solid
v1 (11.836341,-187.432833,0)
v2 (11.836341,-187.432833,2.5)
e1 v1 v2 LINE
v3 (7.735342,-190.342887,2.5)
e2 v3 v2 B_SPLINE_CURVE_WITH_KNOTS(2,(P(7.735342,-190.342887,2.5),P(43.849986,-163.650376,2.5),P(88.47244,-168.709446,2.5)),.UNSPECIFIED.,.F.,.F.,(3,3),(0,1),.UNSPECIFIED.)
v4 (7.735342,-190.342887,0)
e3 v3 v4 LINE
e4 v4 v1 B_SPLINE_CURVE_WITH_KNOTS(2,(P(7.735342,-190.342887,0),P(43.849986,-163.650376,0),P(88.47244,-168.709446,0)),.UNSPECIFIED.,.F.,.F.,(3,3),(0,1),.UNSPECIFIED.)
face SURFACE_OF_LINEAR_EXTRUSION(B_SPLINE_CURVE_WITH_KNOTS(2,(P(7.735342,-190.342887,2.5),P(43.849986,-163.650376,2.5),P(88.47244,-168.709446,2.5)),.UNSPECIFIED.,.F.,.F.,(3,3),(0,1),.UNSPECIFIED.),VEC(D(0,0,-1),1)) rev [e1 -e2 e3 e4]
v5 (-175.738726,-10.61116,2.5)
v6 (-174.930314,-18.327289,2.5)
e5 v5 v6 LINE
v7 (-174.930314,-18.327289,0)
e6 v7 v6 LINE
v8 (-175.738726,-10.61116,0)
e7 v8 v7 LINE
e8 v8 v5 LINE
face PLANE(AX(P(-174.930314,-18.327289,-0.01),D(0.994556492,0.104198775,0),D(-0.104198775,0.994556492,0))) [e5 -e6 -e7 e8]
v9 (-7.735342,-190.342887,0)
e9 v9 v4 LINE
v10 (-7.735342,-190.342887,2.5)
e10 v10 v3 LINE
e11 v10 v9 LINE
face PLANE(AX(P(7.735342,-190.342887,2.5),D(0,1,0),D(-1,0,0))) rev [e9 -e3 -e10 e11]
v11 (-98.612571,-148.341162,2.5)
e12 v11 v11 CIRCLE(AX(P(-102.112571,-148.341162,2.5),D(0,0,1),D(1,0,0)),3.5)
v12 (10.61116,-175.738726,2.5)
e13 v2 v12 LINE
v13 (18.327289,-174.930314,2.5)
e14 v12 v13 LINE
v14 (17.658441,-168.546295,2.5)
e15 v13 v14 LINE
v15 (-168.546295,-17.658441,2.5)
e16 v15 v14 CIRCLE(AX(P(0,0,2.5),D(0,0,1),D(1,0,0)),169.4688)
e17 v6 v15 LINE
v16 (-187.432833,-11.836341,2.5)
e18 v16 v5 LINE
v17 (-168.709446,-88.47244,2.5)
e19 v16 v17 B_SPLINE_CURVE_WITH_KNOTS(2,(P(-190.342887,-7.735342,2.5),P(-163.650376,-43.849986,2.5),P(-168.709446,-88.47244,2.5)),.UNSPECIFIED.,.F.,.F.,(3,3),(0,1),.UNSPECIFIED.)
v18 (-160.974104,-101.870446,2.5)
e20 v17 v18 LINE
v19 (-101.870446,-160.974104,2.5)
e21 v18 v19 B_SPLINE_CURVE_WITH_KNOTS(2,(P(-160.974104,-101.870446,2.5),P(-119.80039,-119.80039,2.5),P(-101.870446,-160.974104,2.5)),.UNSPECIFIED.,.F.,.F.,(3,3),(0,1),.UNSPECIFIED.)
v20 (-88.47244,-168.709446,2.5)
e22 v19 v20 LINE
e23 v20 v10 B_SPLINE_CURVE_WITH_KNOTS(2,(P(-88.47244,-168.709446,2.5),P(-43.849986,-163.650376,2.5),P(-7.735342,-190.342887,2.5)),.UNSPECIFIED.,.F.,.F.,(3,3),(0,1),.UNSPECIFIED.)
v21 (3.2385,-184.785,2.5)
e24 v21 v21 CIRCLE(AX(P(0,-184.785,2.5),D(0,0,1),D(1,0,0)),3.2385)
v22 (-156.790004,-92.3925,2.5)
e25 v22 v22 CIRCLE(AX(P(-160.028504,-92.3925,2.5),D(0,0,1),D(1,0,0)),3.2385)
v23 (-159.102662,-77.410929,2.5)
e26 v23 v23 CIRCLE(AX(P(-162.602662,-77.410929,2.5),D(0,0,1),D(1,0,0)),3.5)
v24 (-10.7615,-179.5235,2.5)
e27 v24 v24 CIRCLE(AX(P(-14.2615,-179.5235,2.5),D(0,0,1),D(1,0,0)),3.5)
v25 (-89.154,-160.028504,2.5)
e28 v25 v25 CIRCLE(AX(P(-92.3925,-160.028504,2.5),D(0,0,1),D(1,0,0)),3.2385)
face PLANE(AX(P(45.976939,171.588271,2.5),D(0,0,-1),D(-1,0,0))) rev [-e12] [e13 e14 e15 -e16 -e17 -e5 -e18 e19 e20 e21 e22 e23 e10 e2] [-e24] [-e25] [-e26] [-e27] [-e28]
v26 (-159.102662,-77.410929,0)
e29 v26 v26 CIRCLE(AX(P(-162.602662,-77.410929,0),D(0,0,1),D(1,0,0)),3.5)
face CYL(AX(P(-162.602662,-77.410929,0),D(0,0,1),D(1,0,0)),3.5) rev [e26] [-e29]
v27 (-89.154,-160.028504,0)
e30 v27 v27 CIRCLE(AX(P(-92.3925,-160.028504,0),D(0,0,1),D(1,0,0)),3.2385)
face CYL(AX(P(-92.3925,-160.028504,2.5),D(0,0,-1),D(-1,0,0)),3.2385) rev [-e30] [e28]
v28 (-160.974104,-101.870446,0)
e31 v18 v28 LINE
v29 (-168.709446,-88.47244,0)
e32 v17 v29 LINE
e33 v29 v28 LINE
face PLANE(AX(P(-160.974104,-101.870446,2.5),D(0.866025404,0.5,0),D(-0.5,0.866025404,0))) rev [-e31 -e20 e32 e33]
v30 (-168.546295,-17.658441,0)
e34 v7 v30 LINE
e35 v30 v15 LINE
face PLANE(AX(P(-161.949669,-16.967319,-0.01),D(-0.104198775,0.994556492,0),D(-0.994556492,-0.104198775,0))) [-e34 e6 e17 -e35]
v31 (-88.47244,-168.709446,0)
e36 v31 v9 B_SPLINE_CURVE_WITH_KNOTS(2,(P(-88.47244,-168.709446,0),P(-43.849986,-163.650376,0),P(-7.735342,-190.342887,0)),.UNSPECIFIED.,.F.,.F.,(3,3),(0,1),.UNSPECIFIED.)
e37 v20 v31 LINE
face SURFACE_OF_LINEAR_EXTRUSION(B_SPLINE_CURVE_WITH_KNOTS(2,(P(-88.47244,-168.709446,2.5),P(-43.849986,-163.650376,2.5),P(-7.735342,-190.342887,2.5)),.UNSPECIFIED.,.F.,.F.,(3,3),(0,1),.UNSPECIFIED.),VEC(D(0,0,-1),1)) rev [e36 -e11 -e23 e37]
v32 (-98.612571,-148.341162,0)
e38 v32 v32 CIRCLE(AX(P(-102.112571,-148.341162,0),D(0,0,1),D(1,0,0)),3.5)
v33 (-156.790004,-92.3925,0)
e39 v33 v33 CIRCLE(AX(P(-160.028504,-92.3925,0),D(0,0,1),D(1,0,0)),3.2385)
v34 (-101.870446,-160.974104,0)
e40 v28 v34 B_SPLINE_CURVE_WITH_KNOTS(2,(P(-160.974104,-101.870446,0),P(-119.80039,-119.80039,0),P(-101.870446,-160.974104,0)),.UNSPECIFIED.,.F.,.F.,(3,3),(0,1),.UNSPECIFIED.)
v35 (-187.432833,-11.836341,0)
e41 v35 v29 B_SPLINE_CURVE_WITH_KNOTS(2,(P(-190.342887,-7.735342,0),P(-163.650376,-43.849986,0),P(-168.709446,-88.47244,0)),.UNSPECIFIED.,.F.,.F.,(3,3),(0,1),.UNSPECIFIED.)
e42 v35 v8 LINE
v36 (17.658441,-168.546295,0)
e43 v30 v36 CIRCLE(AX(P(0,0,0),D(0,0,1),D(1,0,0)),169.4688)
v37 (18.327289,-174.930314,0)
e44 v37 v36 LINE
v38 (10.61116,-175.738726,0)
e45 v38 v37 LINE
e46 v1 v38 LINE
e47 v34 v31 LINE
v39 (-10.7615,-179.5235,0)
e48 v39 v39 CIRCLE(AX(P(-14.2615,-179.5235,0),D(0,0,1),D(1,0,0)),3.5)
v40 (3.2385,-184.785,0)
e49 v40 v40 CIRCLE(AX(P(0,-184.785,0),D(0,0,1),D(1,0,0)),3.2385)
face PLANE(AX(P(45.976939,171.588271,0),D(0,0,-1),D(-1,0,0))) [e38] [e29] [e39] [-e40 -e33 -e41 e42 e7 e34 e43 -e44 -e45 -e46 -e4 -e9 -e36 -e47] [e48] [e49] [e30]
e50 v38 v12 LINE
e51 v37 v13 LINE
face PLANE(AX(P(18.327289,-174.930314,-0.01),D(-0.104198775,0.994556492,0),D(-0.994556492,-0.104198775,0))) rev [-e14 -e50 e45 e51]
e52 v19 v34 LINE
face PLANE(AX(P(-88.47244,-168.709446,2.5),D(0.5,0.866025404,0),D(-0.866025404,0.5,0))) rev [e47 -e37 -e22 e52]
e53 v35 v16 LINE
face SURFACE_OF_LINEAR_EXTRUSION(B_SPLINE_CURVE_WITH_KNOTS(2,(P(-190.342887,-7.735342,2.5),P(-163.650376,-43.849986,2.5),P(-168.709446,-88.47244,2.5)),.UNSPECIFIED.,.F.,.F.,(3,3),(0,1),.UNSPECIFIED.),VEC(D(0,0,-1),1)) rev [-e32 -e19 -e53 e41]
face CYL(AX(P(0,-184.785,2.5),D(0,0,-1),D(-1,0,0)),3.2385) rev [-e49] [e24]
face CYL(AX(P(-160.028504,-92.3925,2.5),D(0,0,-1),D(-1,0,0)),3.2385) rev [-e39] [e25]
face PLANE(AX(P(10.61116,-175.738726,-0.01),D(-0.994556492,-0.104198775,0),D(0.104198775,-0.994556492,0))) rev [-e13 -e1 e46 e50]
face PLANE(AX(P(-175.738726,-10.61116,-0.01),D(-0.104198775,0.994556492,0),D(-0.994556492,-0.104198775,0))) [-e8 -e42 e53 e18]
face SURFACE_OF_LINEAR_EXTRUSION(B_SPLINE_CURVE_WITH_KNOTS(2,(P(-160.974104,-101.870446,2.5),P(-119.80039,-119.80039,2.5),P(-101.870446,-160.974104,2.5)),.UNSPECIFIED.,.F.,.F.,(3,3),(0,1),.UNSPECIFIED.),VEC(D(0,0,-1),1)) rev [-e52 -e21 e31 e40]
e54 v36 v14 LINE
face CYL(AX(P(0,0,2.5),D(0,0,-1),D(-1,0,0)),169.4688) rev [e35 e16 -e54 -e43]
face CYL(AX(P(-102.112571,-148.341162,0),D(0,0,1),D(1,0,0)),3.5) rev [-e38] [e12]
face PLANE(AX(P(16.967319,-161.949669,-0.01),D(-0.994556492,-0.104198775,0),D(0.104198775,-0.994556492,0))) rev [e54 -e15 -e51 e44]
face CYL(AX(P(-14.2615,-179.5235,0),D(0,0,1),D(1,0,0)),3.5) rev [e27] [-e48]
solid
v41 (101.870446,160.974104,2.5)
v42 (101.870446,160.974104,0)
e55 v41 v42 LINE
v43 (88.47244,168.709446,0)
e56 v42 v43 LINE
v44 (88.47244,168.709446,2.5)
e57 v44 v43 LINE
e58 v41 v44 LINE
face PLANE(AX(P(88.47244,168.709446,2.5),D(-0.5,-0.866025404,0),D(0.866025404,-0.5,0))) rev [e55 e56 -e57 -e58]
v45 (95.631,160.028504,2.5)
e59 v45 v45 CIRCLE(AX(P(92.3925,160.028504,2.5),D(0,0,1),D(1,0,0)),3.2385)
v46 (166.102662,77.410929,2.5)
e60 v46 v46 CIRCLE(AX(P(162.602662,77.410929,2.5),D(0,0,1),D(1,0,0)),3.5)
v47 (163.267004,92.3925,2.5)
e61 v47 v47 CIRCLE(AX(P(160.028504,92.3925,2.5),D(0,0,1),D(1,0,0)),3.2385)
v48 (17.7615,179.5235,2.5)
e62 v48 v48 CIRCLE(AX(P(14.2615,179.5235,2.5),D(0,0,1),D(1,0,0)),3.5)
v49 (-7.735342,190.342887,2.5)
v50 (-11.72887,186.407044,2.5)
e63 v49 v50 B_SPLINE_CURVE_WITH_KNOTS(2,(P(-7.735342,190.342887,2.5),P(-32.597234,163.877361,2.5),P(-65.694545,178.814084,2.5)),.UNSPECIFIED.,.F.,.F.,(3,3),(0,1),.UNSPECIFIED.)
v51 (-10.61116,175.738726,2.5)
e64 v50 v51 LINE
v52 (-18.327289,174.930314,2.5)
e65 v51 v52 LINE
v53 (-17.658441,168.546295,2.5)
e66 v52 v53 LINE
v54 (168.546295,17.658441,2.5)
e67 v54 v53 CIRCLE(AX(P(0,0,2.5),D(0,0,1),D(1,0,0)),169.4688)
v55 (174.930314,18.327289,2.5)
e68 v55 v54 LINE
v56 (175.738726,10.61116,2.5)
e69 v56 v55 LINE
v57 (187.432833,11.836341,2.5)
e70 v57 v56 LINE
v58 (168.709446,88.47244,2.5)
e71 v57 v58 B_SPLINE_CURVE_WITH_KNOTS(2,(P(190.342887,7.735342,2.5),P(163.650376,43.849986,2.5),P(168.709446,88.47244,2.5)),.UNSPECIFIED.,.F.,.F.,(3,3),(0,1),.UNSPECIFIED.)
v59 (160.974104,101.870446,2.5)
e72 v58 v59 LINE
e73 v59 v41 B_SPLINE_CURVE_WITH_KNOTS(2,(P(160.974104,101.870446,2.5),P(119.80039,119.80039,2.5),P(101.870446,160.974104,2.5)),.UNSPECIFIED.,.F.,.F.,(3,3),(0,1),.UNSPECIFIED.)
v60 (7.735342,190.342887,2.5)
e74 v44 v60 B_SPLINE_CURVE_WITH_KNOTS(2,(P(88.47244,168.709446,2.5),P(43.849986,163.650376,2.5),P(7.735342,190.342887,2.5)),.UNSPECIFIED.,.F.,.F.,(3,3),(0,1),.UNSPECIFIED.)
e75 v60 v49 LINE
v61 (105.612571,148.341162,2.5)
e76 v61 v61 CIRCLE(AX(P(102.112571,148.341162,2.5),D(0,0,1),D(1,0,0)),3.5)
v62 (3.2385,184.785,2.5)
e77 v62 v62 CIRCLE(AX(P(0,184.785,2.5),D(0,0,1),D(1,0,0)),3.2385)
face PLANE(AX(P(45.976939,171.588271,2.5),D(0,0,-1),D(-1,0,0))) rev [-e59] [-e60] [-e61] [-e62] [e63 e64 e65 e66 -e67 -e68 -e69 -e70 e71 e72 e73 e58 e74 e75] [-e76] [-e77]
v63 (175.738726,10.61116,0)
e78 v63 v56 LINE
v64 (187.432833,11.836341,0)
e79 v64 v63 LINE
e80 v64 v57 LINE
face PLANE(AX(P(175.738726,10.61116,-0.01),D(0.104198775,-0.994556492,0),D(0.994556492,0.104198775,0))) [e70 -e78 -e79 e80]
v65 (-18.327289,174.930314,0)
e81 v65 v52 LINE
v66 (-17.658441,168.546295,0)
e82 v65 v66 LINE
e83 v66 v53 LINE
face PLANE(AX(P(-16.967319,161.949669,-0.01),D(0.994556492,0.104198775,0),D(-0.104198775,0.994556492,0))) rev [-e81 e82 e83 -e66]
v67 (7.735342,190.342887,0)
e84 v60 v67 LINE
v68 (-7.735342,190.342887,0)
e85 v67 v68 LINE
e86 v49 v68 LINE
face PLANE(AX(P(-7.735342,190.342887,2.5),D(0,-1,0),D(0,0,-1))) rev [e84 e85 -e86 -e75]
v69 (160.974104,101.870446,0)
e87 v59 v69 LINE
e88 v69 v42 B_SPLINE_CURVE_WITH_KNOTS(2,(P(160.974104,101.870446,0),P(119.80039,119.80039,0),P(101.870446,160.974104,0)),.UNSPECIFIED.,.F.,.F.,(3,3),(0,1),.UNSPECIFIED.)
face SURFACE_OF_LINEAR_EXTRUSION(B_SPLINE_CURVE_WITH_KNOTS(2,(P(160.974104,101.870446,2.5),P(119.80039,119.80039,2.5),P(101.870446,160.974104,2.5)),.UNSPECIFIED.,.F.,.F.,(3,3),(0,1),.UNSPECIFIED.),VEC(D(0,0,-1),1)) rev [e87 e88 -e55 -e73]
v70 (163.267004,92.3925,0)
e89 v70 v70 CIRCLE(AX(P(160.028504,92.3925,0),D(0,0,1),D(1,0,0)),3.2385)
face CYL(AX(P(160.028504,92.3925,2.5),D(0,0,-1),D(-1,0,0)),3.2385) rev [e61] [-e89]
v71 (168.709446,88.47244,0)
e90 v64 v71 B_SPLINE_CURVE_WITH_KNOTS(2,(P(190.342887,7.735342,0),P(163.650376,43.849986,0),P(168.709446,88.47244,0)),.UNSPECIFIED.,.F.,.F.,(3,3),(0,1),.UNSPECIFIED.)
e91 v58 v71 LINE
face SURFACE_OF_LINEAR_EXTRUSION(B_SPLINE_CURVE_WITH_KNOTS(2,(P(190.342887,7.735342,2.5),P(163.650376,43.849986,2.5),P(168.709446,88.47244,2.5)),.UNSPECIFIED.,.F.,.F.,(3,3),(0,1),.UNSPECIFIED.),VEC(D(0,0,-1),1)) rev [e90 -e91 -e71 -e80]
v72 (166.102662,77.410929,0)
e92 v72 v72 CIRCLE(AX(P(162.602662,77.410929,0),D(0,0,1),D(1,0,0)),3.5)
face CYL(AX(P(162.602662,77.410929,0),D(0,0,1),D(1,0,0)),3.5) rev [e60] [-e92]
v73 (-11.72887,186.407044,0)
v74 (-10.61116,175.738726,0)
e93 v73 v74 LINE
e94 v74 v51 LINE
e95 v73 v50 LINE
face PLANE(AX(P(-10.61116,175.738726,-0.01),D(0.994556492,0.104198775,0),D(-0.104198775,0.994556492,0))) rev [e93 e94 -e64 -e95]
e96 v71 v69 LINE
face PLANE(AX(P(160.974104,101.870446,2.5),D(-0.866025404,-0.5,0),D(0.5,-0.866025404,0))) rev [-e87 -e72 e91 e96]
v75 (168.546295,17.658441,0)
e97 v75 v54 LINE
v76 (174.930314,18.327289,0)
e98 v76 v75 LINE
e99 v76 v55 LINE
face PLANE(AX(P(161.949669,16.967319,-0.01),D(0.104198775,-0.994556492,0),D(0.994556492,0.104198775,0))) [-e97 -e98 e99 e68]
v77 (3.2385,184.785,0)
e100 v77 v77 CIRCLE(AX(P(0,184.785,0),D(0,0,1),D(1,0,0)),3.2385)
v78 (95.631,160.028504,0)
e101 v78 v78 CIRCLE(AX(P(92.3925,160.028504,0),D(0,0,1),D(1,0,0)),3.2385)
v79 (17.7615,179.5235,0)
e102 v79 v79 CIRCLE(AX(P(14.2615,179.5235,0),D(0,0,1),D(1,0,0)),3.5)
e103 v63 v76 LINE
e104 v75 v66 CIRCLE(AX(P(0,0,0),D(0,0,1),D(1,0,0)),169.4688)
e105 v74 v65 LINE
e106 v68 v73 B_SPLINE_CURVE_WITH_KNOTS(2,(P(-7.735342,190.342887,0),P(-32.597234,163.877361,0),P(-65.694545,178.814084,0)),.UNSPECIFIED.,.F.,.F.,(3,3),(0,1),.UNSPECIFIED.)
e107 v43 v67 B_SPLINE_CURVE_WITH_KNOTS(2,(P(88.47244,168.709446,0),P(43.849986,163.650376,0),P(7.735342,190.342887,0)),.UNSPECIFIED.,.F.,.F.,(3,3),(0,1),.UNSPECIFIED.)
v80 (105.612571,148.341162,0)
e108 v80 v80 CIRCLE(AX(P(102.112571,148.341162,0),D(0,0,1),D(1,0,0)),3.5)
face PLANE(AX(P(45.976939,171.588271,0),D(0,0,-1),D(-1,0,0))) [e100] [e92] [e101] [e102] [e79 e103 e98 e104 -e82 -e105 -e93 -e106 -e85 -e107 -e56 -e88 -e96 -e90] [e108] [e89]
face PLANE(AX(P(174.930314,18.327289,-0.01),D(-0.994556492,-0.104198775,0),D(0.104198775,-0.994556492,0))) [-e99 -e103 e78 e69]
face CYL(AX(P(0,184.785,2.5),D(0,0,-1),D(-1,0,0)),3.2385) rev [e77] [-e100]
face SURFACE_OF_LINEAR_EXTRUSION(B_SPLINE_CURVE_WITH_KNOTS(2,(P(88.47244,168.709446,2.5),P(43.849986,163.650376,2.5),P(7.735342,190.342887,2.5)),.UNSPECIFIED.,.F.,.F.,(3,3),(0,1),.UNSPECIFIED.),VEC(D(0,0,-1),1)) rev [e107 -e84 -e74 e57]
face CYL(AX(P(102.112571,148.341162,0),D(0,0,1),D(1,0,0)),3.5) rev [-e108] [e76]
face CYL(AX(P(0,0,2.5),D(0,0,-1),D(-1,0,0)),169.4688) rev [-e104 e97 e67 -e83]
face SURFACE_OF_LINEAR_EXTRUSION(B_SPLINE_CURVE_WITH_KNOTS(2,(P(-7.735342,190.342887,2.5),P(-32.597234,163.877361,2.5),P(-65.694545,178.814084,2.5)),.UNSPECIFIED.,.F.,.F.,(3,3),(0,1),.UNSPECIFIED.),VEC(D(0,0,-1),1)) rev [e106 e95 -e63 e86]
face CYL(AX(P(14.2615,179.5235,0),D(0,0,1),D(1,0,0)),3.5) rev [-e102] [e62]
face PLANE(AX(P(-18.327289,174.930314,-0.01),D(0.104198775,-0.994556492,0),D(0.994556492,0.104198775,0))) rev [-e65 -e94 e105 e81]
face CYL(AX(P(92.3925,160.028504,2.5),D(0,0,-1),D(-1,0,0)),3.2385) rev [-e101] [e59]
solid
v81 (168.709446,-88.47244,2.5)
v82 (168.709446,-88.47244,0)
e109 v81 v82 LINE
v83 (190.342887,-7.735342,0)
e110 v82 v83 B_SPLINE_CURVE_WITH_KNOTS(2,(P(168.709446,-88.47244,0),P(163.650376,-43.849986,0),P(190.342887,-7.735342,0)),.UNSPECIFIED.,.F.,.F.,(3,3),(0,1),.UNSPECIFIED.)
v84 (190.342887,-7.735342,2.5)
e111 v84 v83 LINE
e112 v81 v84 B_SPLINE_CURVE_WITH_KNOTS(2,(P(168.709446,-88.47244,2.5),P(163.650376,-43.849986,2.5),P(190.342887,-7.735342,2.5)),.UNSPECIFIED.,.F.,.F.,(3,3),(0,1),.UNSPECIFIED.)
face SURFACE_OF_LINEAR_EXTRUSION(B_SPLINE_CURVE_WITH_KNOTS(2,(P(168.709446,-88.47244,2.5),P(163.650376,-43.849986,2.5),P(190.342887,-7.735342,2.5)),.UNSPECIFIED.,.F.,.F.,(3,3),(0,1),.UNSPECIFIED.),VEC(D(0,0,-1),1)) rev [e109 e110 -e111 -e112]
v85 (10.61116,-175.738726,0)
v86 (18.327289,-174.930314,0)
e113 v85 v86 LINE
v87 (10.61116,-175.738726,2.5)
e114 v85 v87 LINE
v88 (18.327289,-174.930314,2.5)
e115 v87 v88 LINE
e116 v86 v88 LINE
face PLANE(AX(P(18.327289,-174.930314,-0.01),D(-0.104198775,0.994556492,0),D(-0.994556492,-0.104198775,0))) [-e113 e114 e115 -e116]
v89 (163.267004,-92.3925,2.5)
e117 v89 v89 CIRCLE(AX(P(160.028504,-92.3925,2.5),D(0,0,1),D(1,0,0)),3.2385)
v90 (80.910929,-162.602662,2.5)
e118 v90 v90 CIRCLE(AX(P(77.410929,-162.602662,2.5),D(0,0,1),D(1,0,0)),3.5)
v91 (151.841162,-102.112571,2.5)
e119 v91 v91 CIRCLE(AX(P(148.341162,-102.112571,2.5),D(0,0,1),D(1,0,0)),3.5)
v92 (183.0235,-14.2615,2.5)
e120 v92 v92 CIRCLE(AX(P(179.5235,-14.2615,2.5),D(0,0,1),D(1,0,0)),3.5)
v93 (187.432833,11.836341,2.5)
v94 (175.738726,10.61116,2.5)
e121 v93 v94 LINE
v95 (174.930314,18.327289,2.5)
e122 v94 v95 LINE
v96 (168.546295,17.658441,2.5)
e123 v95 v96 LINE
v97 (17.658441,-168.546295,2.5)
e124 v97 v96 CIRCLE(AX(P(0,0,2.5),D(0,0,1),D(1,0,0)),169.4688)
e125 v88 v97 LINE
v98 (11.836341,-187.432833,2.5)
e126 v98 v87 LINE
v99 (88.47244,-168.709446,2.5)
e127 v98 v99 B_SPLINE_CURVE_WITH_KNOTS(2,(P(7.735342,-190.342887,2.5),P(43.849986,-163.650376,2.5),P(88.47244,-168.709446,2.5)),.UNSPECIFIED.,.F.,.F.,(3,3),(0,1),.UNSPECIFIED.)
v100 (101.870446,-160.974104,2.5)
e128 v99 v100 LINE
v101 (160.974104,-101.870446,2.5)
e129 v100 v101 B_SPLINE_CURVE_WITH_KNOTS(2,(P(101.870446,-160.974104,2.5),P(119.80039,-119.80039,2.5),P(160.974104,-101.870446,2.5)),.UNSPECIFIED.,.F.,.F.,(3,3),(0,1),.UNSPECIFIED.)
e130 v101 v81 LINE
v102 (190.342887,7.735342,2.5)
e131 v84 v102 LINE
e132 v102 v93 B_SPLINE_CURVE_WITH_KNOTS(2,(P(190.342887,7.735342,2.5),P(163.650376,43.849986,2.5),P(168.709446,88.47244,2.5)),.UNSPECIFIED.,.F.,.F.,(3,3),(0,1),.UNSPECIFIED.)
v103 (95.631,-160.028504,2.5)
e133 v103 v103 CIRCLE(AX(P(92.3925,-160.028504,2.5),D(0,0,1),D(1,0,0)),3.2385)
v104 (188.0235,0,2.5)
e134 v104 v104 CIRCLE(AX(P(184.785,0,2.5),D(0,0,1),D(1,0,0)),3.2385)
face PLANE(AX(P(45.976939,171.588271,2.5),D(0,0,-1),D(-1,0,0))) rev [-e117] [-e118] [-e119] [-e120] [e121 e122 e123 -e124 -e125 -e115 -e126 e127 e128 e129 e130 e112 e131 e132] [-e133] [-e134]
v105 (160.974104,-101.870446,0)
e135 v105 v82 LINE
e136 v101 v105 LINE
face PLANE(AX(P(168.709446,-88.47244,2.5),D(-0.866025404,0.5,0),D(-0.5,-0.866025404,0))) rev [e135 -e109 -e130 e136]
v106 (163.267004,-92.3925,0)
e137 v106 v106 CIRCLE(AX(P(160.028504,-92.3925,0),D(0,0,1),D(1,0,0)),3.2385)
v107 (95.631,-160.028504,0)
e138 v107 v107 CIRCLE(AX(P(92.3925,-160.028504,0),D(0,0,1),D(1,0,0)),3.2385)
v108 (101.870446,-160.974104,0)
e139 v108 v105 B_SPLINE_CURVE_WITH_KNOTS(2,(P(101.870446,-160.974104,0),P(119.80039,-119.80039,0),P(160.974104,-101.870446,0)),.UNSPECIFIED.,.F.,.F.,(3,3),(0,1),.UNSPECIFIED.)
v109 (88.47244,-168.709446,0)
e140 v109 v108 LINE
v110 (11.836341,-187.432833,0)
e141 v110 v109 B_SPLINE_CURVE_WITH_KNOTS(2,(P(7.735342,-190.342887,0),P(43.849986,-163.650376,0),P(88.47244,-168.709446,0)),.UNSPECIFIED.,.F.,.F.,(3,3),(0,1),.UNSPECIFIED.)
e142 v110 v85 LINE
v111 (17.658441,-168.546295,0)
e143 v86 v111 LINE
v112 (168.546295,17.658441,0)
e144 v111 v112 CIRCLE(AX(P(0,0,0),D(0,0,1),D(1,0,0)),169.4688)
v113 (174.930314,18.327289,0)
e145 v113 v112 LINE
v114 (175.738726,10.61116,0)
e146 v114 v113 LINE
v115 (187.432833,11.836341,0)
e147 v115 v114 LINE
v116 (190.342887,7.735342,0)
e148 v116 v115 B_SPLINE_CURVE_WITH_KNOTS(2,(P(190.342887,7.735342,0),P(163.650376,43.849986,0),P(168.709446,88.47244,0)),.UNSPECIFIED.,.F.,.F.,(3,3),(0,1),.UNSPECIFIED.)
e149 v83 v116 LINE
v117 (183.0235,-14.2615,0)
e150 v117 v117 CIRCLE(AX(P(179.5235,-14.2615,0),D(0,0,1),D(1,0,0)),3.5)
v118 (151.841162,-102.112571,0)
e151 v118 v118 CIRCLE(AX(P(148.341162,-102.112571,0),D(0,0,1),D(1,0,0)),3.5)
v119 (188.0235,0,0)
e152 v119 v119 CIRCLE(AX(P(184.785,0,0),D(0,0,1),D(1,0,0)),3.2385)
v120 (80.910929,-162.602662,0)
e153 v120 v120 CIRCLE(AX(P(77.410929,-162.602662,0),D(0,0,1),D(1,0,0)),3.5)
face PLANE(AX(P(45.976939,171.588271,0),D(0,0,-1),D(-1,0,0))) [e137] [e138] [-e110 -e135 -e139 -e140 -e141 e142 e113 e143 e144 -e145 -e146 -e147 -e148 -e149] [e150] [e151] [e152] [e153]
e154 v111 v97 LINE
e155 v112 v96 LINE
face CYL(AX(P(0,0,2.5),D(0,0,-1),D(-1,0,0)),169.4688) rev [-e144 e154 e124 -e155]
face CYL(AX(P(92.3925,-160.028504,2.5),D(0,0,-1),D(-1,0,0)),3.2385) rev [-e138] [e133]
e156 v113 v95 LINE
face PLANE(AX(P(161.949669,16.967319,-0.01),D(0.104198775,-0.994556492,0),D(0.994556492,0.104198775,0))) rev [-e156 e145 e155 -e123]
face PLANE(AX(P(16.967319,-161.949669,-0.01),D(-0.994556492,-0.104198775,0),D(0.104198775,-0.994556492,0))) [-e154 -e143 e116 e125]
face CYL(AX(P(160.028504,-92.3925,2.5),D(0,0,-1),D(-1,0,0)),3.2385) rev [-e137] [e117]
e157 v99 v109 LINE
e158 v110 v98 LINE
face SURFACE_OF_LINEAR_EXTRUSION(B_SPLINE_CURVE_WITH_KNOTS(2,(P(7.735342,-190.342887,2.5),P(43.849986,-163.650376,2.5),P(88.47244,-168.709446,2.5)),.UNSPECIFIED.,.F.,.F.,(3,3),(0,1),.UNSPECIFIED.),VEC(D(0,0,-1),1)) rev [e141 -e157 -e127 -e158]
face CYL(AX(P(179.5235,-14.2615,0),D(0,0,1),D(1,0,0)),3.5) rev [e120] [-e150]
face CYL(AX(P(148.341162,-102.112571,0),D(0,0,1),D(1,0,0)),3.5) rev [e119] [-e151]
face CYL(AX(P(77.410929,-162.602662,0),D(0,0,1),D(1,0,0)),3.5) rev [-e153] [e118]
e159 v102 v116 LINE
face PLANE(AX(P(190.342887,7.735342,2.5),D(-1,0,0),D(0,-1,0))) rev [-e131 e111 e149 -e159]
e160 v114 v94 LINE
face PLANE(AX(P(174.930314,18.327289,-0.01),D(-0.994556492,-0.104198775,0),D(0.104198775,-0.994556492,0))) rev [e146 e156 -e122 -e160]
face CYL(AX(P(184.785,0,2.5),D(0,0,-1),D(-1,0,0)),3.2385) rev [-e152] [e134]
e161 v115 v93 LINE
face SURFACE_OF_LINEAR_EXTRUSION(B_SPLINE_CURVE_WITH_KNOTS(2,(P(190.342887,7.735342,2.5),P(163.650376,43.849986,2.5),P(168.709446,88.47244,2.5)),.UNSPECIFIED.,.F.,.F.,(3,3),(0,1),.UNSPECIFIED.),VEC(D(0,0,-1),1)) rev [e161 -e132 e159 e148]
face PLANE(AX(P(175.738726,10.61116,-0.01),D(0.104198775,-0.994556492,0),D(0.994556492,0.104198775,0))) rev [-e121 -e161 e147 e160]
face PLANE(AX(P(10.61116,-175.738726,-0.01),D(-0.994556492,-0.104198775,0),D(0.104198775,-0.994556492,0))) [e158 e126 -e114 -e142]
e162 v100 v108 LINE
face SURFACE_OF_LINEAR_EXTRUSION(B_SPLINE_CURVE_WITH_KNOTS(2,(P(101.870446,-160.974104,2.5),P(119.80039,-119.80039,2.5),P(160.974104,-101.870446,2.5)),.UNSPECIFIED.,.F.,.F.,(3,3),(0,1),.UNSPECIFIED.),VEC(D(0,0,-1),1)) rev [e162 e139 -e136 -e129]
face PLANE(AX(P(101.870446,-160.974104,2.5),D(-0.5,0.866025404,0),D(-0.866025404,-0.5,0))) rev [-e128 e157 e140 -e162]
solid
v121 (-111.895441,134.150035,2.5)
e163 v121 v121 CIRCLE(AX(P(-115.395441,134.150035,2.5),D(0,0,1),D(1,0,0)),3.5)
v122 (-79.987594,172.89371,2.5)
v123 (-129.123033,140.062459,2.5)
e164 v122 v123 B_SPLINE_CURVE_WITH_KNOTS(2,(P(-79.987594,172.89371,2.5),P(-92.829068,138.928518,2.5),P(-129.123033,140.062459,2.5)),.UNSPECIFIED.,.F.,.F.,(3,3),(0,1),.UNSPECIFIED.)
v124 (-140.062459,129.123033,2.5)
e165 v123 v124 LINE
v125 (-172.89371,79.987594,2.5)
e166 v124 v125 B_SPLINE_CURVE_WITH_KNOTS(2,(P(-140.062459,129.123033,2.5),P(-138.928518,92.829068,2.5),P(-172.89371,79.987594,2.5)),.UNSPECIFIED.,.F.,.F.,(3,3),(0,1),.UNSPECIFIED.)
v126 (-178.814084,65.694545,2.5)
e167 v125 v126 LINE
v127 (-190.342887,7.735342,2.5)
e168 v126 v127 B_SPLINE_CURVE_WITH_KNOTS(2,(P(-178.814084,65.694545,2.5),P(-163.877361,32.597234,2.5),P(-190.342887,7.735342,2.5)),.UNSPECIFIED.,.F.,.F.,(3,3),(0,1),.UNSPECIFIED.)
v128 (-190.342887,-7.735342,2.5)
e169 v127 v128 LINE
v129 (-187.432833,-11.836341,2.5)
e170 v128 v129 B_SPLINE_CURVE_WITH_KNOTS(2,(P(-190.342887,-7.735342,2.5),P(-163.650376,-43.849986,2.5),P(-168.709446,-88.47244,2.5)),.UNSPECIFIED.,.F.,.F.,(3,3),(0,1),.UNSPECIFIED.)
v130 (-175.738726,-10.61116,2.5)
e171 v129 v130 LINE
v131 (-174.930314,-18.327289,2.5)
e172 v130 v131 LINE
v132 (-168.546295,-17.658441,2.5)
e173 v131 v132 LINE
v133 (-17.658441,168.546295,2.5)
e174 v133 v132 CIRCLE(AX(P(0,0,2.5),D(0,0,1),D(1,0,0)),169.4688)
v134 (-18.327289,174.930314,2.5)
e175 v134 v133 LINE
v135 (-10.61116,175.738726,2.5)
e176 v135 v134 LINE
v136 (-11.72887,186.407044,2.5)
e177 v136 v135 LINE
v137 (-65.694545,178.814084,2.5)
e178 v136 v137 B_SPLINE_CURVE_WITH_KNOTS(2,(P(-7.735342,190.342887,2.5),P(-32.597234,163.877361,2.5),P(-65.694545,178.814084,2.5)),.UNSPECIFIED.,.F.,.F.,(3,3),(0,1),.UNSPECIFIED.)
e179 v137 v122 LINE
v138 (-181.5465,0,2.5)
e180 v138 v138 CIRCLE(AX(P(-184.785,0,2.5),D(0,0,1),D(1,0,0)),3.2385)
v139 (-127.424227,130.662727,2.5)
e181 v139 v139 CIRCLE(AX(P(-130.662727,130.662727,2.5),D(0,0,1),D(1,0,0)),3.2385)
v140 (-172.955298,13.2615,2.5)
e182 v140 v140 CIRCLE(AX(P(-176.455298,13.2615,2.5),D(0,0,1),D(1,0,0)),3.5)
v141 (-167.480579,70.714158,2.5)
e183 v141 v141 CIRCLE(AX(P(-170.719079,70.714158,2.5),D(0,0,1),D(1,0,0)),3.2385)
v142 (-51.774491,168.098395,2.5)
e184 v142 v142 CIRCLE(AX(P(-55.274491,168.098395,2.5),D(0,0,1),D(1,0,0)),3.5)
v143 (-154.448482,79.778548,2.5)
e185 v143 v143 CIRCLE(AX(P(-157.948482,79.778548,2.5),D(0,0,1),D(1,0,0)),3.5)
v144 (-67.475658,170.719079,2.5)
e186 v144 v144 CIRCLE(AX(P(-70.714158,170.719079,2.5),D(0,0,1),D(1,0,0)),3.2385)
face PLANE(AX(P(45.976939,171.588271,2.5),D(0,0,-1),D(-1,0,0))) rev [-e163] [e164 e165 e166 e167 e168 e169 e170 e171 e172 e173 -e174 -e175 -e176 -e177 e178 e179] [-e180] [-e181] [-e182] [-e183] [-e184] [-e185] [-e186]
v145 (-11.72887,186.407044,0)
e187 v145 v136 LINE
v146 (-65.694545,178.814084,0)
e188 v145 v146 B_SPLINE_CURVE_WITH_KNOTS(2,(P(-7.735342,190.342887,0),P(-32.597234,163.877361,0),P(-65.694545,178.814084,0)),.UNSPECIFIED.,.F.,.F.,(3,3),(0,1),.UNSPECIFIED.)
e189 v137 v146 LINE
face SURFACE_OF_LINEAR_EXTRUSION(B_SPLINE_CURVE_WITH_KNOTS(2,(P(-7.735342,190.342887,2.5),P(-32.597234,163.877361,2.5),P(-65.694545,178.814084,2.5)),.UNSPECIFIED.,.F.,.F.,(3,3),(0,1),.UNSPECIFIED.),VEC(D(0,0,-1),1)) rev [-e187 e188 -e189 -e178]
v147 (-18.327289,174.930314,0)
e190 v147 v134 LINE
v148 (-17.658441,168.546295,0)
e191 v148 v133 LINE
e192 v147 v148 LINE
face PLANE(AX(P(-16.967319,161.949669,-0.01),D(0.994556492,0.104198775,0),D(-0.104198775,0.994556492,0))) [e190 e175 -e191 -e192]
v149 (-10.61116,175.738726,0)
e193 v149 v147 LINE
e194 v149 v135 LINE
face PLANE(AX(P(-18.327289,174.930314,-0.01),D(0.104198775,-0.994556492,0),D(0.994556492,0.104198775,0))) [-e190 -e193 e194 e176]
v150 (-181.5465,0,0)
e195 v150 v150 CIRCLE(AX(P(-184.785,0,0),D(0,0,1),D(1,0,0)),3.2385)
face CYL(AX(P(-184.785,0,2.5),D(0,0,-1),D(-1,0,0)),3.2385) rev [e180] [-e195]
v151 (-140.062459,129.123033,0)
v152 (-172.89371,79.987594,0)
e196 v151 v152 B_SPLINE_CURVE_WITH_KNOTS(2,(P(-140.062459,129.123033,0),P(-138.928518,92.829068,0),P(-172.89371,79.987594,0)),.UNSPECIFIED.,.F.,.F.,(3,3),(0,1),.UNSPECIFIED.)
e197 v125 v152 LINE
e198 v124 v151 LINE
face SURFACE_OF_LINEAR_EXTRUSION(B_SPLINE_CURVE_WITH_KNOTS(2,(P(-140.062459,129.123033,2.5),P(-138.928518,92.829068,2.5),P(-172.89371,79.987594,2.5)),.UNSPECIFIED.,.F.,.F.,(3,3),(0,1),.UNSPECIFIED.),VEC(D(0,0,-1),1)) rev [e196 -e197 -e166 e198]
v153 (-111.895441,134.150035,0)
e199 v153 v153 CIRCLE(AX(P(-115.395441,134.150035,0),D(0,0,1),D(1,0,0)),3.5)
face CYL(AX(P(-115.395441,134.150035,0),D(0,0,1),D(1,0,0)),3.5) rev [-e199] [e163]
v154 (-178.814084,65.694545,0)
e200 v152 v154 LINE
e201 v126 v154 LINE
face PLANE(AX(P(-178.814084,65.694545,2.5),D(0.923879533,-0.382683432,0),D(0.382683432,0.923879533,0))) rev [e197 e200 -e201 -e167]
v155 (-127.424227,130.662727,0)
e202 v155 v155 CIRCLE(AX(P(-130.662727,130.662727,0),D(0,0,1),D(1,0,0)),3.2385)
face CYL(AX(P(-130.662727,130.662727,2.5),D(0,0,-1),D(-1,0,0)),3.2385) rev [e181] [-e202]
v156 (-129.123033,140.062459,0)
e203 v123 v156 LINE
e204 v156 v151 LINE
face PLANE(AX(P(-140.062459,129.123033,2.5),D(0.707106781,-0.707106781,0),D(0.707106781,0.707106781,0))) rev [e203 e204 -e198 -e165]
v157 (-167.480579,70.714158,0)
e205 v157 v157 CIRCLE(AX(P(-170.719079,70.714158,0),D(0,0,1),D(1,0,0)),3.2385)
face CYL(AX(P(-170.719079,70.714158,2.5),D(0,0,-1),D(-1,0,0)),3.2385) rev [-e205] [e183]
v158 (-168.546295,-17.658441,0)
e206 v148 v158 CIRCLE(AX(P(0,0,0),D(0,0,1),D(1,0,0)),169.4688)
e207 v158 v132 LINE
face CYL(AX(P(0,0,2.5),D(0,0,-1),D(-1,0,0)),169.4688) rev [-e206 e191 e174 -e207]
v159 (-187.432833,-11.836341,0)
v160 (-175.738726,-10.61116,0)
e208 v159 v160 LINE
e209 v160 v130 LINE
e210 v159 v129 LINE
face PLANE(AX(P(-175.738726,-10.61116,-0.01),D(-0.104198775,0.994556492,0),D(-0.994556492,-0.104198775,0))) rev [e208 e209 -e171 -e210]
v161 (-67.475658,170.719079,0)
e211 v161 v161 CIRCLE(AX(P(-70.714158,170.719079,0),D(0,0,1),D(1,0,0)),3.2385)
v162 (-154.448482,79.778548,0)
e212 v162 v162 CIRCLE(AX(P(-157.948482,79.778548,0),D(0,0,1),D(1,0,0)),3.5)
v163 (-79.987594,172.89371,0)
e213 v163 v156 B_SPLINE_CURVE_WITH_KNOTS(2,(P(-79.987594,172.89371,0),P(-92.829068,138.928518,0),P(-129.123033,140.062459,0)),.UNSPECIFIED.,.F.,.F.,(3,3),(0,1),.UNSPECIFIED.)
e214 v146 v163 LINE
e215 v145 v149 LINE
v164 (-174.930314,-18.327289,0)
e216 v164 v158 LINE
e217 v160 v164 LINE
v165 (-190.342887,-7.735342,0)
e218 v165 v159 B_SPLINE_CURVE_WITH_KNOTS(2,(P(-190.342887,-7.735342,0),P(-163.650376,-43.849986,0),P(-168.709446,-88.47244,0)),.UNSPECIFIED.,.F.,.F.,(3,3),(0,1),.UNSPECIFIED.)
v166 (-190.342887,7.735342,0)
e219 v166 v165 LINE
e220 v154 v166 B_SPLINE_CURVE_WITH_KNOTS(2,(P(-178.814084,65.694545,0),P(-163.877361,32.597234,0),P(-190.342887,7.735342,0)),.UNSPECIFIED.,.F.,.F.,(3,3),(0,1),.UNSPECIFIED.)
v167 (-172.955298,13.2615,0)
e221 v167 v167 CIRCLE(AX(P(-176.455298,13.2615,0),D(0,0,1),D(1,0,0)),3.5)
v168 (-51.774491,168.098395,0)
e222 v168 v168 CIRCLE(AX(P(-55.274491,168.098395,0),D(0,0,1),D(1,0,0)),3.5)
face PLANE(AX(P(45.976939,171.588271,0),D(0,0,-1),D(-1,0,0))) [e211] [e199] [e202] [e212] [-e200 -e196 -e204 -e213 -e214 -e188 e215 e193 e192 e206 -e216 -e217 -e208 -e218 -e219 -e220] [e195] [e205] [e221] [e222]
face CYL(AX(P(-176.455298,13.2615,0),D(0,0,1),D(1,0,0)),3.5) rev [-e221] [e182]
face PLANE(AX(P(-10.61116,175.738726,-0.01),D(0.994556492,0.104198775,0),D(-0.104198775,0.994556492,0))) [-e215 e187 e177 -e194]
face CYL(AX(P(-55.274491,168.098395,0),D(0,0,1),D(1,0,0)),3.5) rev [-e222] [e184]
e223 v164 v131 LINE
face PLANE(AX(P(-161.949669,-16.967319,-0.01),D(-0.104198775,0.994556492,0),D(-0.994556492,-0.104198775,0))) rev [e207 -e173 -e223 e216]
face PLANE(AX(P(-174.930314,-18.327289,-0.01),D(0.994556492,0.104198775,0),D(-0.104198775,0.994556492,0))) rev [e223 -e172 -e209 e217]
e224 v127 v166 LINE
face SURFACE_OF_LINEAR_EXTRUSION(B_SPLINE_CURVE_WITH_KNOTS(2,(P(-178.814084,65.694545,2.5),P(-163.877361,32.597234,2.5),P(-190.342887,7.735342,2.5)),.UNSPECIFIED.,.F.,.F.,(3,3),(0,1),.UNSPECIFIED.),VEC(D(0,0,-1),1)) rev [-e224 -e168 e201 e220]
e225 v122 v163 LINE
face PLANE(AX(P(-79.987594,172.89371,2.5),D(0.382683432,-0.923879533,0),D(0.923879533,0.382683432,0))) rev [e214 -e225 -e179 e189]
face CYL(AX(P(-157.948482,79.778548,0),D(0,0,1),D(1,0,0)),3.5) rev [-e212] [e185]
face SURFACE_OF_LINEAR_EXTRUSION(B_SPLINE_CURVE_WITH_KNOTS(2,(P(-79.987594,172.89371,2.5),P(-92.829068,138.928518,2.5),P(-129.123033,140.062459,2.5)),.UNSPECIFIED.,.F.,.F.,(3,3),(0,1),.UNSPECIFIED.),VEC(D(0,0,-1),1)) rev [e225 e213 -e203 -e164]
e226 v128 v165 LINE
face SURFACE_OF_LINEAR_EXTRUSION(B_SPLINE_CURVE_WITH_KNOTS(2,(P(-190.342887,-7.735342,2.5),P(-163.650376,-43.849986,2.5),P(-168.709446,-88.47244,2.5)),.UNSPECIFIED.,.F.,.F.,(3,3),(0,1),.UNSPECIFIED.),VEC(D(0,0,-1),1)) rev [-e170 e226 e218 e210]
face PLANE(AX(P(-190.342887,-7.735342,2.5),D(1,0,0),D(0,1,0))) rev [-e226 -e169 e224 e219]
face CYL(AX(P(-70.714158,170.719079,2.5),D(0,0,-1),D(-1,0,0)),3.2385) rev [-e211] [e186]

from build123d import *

# Parameters (mm, degrees)
SKETCH4_R            = 169.4688
SKETCH4_R_2          = 3.2385
BOSS_EXTRUDE2_DEPTH  = 2.5
SKETCH8_R            = 3.5
CUT_EXTRUDE2_DEPTH   = 270.197100715
SPLIT1_OUTLINE_R     = 3.5
SPLIT1_OUTLINE_R_2   = 3.2385
SPLIT1_DEPTH         = 2.5
SPLIT1_2_OUTLINE_R   = 3.5
SPLIT1_2_OUTLINE_R_2 = 3.2385
SPLIT1_2_DEPTH       = 2.5
SPLIT1_3_OUTLINE_R   = 3.2385
SPLIT1_3_OUTLINE_R_2 = 3.5
SPLIT1_3_DEPTH       = 2.5
SPLIT1_4_OUTLINE_R   = 3.5
SPLIT1_4_OUTLINE_R_2 = 3.2385
SPLIT1_4_DEPTH       = 2.5


# Read off the part's stored shape, not the designer's step: Split1
with BuildPart() as part:
    # Sketch4 → Boss-Extrude2 (new body)
    with BuildSketch(Plane.XY):
        with BuildLine():
            Line((-7.735342369, 190.342886598), (7.735342369, 190.342886598))
            add(Edge.make_bspline(
                [(7.735342369, 190.342886598), (43.849986057, 163.650375876), (88.472440301, 168.709446408)],
                knots=[0, 0, 0, 1, 1, 1], degree=2))
            Line((88.472440301, 168.709446408), (101.870446297, 160.974104039))
            add(Edge.make_bspline(
                [(101.870446297, 160.974104039), (119.800389819, 119.800389819), (160.974104039, 101.870446297)],
                knots=[0, 0, 0, 1, 1, 1], degree=2))
            Line((160.974104039, 101.870446297), (168.709446408, 88.472440301))
            add(Edge.make_bspline(
                [(168.709446408, 88.472440301), (163.650375876, 43.849986057), (190.342886598, 7.735342369)],
                knots=[0, 0, 0, 1, 1, 1], degree=2))
            Line((190.342886598, 7.735342369), (190.342886598, -7.735342369))
            add(Edge.make_bspline(
                [(190.342886598, -7.735342369), (163.650375876, -43.849986057), (168.709446408, -88.472440301)],
                knots=[0, 0, 0, 1, 1, 1], degree=2))
            Line((168.709446408, -88.472440301), (160.974104039, -101.870446297))
            add(Edge.make_bspline(
                [(160.974104039, -101.870446297), (119.800389819, -119.800389819), (101.870446297, -160.974104039)],
                knots=[0, 0, 0, 1, 1, 1], degree=2))
            Line((101.870446297, -160.974104039), (88.472440301, -168.709446408))
            add(Edge.make_bspline(
                [(88.472440301, -168.709446408), (43.849986057, -163.650375876), (7.735342369, -190.342886598)],
                knots=[0, 0, 0, 1, 1, 1], degree=2))
            Line((7.735342369, -190.342886598), (-7.735342369, -190.342886598))
            add(Edge.make_bspline(
                [(-7.735342369, -190.342886598), (-43.849986057, -163.650375876), (-88.472440301, -168.709446408)],
                knots=[0, 0, 0, 1, 1, 1], degree=2))
            Line((-88.472440301, -168.709446408), (-101.870446297, -160.974104039))
            add(Edge.make_bspline(
                [(-101.870446297, -160.974104039), (-119.800389819, -119.800389819), (-160.974104039, -101.870446297)],
                knots=[0, 0, 0, 1, 1, 1], degree=2))
            Line((-160.974104039, -101.870446297), (-168.709446408, -88.472440301))
            add(Edge.make_bspline(
                [(-168.709446408, -88.472440301), (-163.650375876, -43.849986057), (-190.342886598, -7.735342369)],
                knots=[0, 0, 0, 1, 1, 1], degree=2))
            Line((-190.342886598, -7.735342369), (-190.342886598, 7.735342369))
            add(Edge.make_bspline(
                [(-190.342886598, 7.735342369), (-163.877360858, 32.597233808), (-178.814084455, 65.694544678)],
                knots=[0, 0, 0, 1, 1, 1], degree=2))
            Line((-178.814084455, 65.694544678), (-172.893709719, 79.987593661))
            add(Edge.make_bspline(
                [(-172.893709719, 79.987593661), (-138.92851822, 92.829068072), (-140.062458908, 129.12303282)],
                knots=[0, 0, 0, 1, 1, 1], degree=2))
            Line((-140.062458908, 129.12303282), (-129.12303282, 140.062458908))
            add(Edge.make_bspline(
                [(-129.12303282, 140.062458908), (-92.829068072, 138.92851822), (-79.987593661, 172.893709719)],
                knots=[0, 0, 0, 1, 1, 1], degree=2))
            Line((-79.987593661, 172.893709719), (-65.694544678, 178.814084455))
            add(Edge.make_bspline(
                [(-65.694544678, 178.814084455), (-32.597233808, 163.877360858), (-7.735342369, 190.342886598)],
                knots=[0, 0, 0, 1, 1, 1], degree=2))
        make_face()
        Circle(SKETCH4_R, mode=Mode.SUBTRACT)
        with Locations((0, 184.785)):
            Circle(SKETCH4_R_2, mode=Mode.SUBTRACT)
        with Locations((-160.028504238, -92.3925)):
            Circle(SKETCH4_R_2, mode=Mode.SUBTRACT)
        with Locations((-92.3925, -160.028504238)):
            Circle(SKETCH4_R_2, mode=Mode.SUBTRACT)
        with Locations((0, -184.785)):
            Circle(SKETCH4_R_2, mode=Mode.SUBTRACT)
        with Locations((92.3925, -160.028504238)):
            Circle(SKETCH4_R_2, mode=Mode.SUBTRACT)
        with Locations((160.028504238, -92.3925)):
            Circle(SKETCH4_R_2, mode=Mode.SUBTRACT)
        with Locations((184.785, 0)):
            Circle(SKETCH4_R_2, mode=Mode.SUBTRACT)
        with Locations((160.028504238, 92.3925)):
            Circle(SKETCH4_R_2, mode=Mode.SUBTRACT)
        with Locations((92.3925, 160.028504238)):
            Circle(SKETCH4_R_2, mode=Mode.SUBTRACT)
        with Locations((-70.71415805, 170.719079415)):
            Circle(SKETCH4_R_2, mode=Mode.SUBTRACT)
        with Locations((-130.662726562, 130.662726562)):
            Circle(SKETCH4_R_2, mode=Mode.SUBTRACT)
        with Locations((-170.719079415, 70.71415805)):
            Circle(SKETCH4_R_2, mode=Mode.SUBTRACT)
        with Locations((-184.785, 0)):
            Circle(SKETCH4_R_2, mode=Mode.SUBTRACT)
    extrude(amount=BOSS_EXTRUDE2_DEPTH)

    # Sketch8 → Cut-Extrude2 (cut, through all)
    with BuildSketch(Plane.XY.offset(2.5)):
        with Locations((14.2615, 179.5235)):
            Circle(SKETCH8_R)
        with Locations((-176.455298363, 13.2615)):
            Circle(SKETCH8_R)
        with Locations((102.112571296, 148.341161576)):
            Circle(SKETCH8_R)
        with Locations((162.602661576, 77.410928704)):
            Circle(SKETCH8_R)
        with Locations((179.5235, -14.2615)):
            Circle(SKETCH8_R)
        with Locations((148.341161576, -102.112571296)):
            Circle(SKETCH8_R)
        with Locations((77.410928704, -162.602661576)):
            Circle(SKETCH8_R)
        with Locations((-14.2615, -179.5235)):
            Circle(SKETCH8_R)
        with Locations((-102.112571296, -148.341161576)):
            Circle(SKETCH8_R)
        with Locations((-162.602661576, -77.410928704)):
            Circle(SKETCH8_R)
        with Locations((-157.948482222, 79.778547657)):
            Circle(SKETCH8_R)
        with Locations((-115.39544147, 134.150034627)):
            Circle(SKETCH8_R)
        with Locations((-55.274490816, 168.098394899)):
            Circle(SKETCH8_R)
    extrude(amount=-CUT_EXTRUDE2_DEPTH, mode=Mode.SUBTRACT)

    # Split1 2 outline → Split1 2 (cut)
    with BuildSketch(Plane.XY):
        with BuildLine():
            Line((-174.930314459, -18.327289217), (-175.73872624, -10.611160262))
            Line((-175.73872624, -10.611160262), (-187.432833101, -11.836341153))
            add(Edge.make_bspline(
                [(-187.432833101, -11.836341153), (-163.935721553, -46.366816835), (-168.709446408, -88.472440301)],
                knots=[0.056402787, 0.056402787, 0.056402787, 1, 1, 1], degree=2))
            Line((-168.709446408, -88.472440301), (-160.974104039, -101.870446297))
            add(Edge.make_bspline(
                [(-160.974104039, -101.870446297), (-119.800389819, -119.800389819), (-101.870446297, -160.974104039)],
                knots=[0, 0, 0, 1, 1, 1], degree=2))
            Line((-101.870446297, -160.974104039), (-88.472440301, -168.709446408))
            add(Edge.make_bspline(
                [(-88.472440301, -168.709446408), (-43.849986057, -163.650375876), (-7.735342369, -190.342886598)],
                knots=[0, 0, 0, 1, 1, 1], degree=2))
            Line((-7.735342369, -190.342886598), (7.735342369, -190.342886598))
            add(Edge.make_bspline(
                [(7.735342369, -190.342886598), (43.849986057, -163.650375876), (88.472440301, -168.709446408)],
                knots=[0, 0, 0, 1, 1, 1], degree=2))
            Line((88.472440301, -168.709446408), (101.870446297, -160.974104039))
            add(Edge.make_bspline(
                [(101.870446297, -160.974104039), (119.800389819, -119.800389819), (160.974104039, -101.870446297)],
                knots=[0, 0, 0, 1, 1, 1], degree=2))
            Line((160.974104039, -101.870446297), (168.709446408, -88.472440301))
            add(Edge.make_bspline(
                [(168.709446408, -88.472440301), (163.650375876, -43.849986057), (190.342886598, -7.735342369)],
                knots=[0, 0, 0, 1, 1, 1], degree=2))
            Line((190.342886598, -7.735342369), (190.342886598, 7.735342369))
            add(Edge.make_bspline(
                [(190.342886598, 7.735342369), (163.650375876, 43.849986057), (168.709446408, 88.472440301)],
                knots=[0, 0, 0, 1, 1, 1], degree=2))
            Line((168.709446408, 88.472440301), (160.974104039, 101.870446297))
            add(Edge.make_bspline(
                [(160.974104039, 101.870446297), (119.800389819, 119.800389819), (101.870446297, 160.974104039)],
                knots=[0, 0, 0, 1, 1, 1], degree=2))
            Line((101.870446297, 160.974104039), (88.472440301, 168.709446408))
            add(Edge.make_bspline(
                [(88.472440301, 168.709446408), (43.849986057, 163.650375876), (7.735342369, 190.342886598)],
                knots=[0, 0, 0, 1, 1, 1], degree=2))
            Line((7.735342369, 190.342886598), (-7.735342369, 190.342886598))
            add(Edge.make_bspline(
                [(-7.735342369, 190.342886598), (-9.706229468, 188.244873928), (-11.728870205, 186.407044366)],
                knots=[0, 0, 0, 0.079273417, 0.079273417, 0.079273417], degree=2))
            Line((-11.728870205, 186.407044366), (-10.611160262, 175.73872624))
            Line((-10.611160262, 175.73872624), (-18.327289217, 174.930314459))
            Line((-18.327289217, 174.930314459), (-17.658441351, 168.546295191))
            ThreePointArc((-17.658441351, 168.546295191), (131.666631898, -106.693824649), (-168.546295191, -17.658441351))
            Line((-168.546295191, -17.658441351), (-174.930314459, -18.327289217))
        make_face()
        with Locations((-102.112571296, -148.341161576)):
            Circle(SPLIT1_2_OUTLINE_R, mode=Mode.SUBTRACT)
        with Locations((-92.3925, -160.028504238)):
            Circle(SPLIT1_2_OUTLINE_R_2, mode=Mode.SUBTRACT)
        with Locations((-14.2615, -179.5235)):
            Circle(SPLIT1_2_OUTLINE_R, mode=Mode.SUBTRACT)
        with Locations((0, -184.785)):
            Circle(SPLIT1_2_OUTLINE_R_2, mode=Mode.SUBTRACT)
        with Locations((-160.028504238, -92.3925)):
            Circle(SPLIT1_2_OUTLINE_R_2, mode=Mode.SUBTRACT)
        with Locations((-162.602661576, -77.410928704)):
            Circle(SPLIT1_2_OUTLINE_R, mode=Mode.SUBTRACT)
        with Locations((77.410928704, -162.602661576)):
            Circle(SPLIT1_2_OUTLINE_R, mode=Mode.SUBTRACT)
        with Locations((92.3925, -160.028504238)):
            Circle(SPLIT1_2_OUTLINE_R_2, mode=Mode.SUBTRACT)
        with Locations((148.341161576, -102.112571296)):
            Circle(SPLIT1_2_OUTLINE_R, mode=Mode.SUBTRACT)
        with Locations((160.028504238, -92.3925)):
            Circle(SPLIT1_2_OUTLINE_R_2, mode=Mode.SUBTRACT)
        with Locations((179.5235, -14.2615)):
            Circle(SPLIT1_2_OUTLINE_R, mode=Mode.SUBTRACT)
        with Locations((184.785, 0)):
            Circle(SPLIT1_2_OUTLINE_R_2, mode=Mode.SUBTRACT)
        with Locations((0, 184.785)):
            Circle(SPLIT1_2_OUTLINE_R_2, mode=Mode.SUBTRACT)
        with Locations((162.602661576, 77.410928704)):
            Circle(SPLIT1_2_OUTLINE_R, mode=Mode.SUBTRACT)
        with Locations((160.028504238, 92.3925)):
            Circle(SPLIT1_2_OUTLINE_R_2, mode=Mode.SUBTRACT)
        with Locations((14.2615, 179.5235)):
            Circle(SPLIT1_2_OUTLINE_R, mode=Mode.SUBTRACT)
        with Locations((92.3925, 160.028504238)):
            Circle(SPLIT1_2_OUTLINE_R_2, mode=Mode.SUBTRACT)
        with Locations((102.112571296, 148.341161576)):
            Circle(SPLIT1_2_OUTLINE_R, mode=Mode.SUBTRACT)
    extrude(amount=SPLIT1_2_DEPTH, mode=Mode.SUBTRACT)


with BuildPart() as body_2:
    # Split1 outline → Split1 (new body)
    with BuildSketch(Plane.XY):
        with BuildLine():
            Line((187.432833101, 11.836341153), (175.73872624, 10.611160262))
            Line((175.73872624, 10.611160262), (174.930314459, 18.327289217))
            Line((174.930314459, 18.327289217), (168.546295191, 17.658441351))
            ThreePointArc((168.546295191, 17.658441351), (131.666631898, -106.693824649), (17.658441351, -168.546295191))
            Line((17.658441351, -168.546295191), (18.327289217, -174.930314459))
            Line((18.327289217, -174.930314459), (10.611160262, -175.73872624))
            Line((10.611160262, -175.73872624), (11.836341153, -187.432833101))
            add(Edge.make_bspline(
                [(11.836341153, -187.432833101), (46.366816835, -163.935721553), (88.472440301, -168.709446408)],
                knots=[0.056402787, 0.056402787, 0.056402787, 1, 1, 1], degree=2))
            Line((88.472440301, -168.709446408), (101.870446297, -160.974104039))
            add(Edge.make_bspline(
                [(101.870446297, -160.974104039), (119.800389819, -119.800389819), (160.974104039, -101.870446297)],
                knots=[0, 0, 0, 1, 1, 1], degree=2))
            Line((160.974104039, -101.870446297), (168.709446408, -88.472440301))
            add(Edge.make_bspline(
                [(168.709446408, -88.472440301), (163.650375876, -43.849986057), (190.342886598, -7.735342369)],
                knots=[0, 0, 0, 1, 1, 1], degree=2))
            Line((190.342886598, -7.735342369), (190.342886598, 7.735342369))
            add(Edge.make_bspline(
                [(190.342886598, 7.735342369), (188.837354604, 9.772308921), (187.432833101, 11.836341153)],
                knots=[0, 0, 0, 0.056402787, 0.056402787, 0.056402787], degree=2))
        make_face()
        with Locations((77.410928704, -162.602661576)):
            Circle(SPLIT1_OUTLINE_R, mode=Mode.SUBTRACT)
        with Locations((92.3925, -160.028504238)):
            Circle(SPLIT1_OUTLINE_R_2, mode=Mode.SUBTRACT)
        with Locations((148.341161576, -102.112571296)):
            Circle(SPLIT1_OUTLINE_R, mode=Mode.SUBTRACT)
        with Locations((160.028504238, -92.3925)):
            Circle(SPLIT1_OUTLINE_R_2, mode=Mode.SUBTRACT)
        with Locations((179.5235, -14.2615)):
            Circle(SPLIT1_OUTLINE_R, mode=Mode.SUBTRACT)
        with Locations((184.785, 0)):
            Circle(SPLIT1_OUTLINE_R_2, mode=Mode.SUBTRACT)
    extrude(amount=SPLIT1_DEPTH)


with BuildPart() as body_3:
    # Split1 3 outline → Split1 3 (new body)
    with BuildSketch(Plane.XY):
        with BuildLine():
            Line((11.836341153, -187.432833101), (10.611160262, -175.73872624))
            Line((10.611160262, -175.73872624), (18.327289217, -174.930314459))
            Line((18.327289217, -174.930314459), (17.658441351, -168.546295191))
            ThreePointArc((17.658441351, -168.546295191), (-106.693824649, -131.666631898), (-168.546295191, -17.658441351))
            Line((-168.546295191, -17.658441351), (-174.930314459, -18.327289217))
            Line((-174.930314459, -18.327289217), (-175.73872624, -10.611160262))
            Line((-175.73872624, -10.611160262), (-187.432833101, -11.836341153))
            add(Edge.make_bspline(
                [(-187.432833101, -11.836341153), (-163.935721553, -46.366816835), (-168.709446408, -88.472440301)],
                knots=[0.056402787, 0.056402787, 0.056402787, 1, 1, 1], degree=2))
            Line((-168.709446408, -88.472440301), (-160.974104039, -101.870446297))
            add(Edge.make_bspline(
                [(-160.974104039, -101.870446297), (-119.800389819, -119.800389819), (-101.870446297, -160.974104039)],
                knots=[0, 0, 0, 1, 1, 1], degree=2))
            Line((-101.870446297, -160.974104039), (-88.472440301, -168.709446408))
            add(Edge.make_bspline(
                [(-88.472440301, -168.709446408), (-43.849986057, -163.650375876), (-7.735342369, -190.342886598)],
                knots=[0, 0, 0, 1, 1, 1], degree=2))
            Line((-7.735342369, -190.342886598), (7.735342369, -190.342886598))
            add(Edge.make_bspline(
                [(7.735342369, -190.342886598), (9.772308921, -188.837354604), (11.836341153, -187.432833101)],
                knots=[0, 0, 0, 0.056402787, 0.056402787, 0.056402787], degree=2))
        make_face()
        with Locations((-92.3925, -160.028504238)):
            Circle(SPLIT1_3_OUTLINE_R, mode=Mode.SUBTRACT)
        with Locations((-102.112571296, -148.341161576)):
            Circle(SPLIT1_3_OUTLINE_R_2, mode=Mode.SUBTRACT)
        with Locations((-14.2615, -179.5235)):
            Circle(SPLIT1_3_OUTLINE_R_2, mode=Mode.SUBTRACT)
        with Locations((0, -184.785)):
            Circle(SPLIT1_3_OUTLINE_R, mode=Mode.SUBTRACT)
        with Locations((-160.028504238, -92.3925)):
            Circle(SPLIT1_3_OUTLINE_R, mode=Mode.SUBTRACT)
        with Locations((-162.602661576, -77.410928704)):
            Circle(SPLIT1_3_OUTLINE_R_2, mode=Mode.SUBTRACT)
    extrude(amount=SPLIT1_3_DEPTH)


with BuildPart() as body_4:
    # Split1 4 outline → Split1 4 (new body)
    with BuildSketch(Plane.XY):
        with BuildLine():
            Line((-11.728870205, 186.407044366), (-10.611160262, 175.73872624))
            Line((-10.611160262, 175.73872624), (-18.327289217, 174.930314459))
            Line((-18.327289217, 174.930314459), (-17.658441351, 168.546295191))
            ThreePointArc((-17.658441351, 168.546295191), (106.693824649, 131.666631898), (168.546295191, 17.658441351))
            Line((168.546295191, 17.658441351), (174.930314459, 18.327289217))
            Line((174.930314459, 18.327289217), (175.73872624, 10.611160262))
            Line((175.73872624, 10.611160262), (187.432833101, 11.836341153))
            add(Edge.make_bspline(
                [(187.432833101, 11.836341153), (163.935721553, 46.366816835), (168.709446408, 88.472440301)],
                knots=[0.056402787, 0.056402787, 0.056402787, 1, 1, 1], degree=2))
            Line((168.709446408, 88.472440301), (160.974104039, 101.870446297))
            add(Edge.make_bspline(
                [(160.974104039, 101.870446297), (119.800389819, 119.800389819), (101.870446297, 160.974104039)],
                knots=[0, 0, 0, 1, 1, 1], degree=2))
            Line((101.870446297, 160.974104039), (88.472440301, 168.709446408))
            add(Edge.make_bspline(
                [(88.472440301, 168.709446408), (43.849986057, 163.650375876), (7.735342369, 190.342886598)],
                knots=[0, 0, 0, 1, 1, 1], degree=2))
            Line((7.735342369, 190.342886598), (-7.735342369, 190.342886598))
            add(Edge.make_bspline(
                [(-7.735342369, 190.342886598), (-9.706229468, 188.244873928), (-11.728870205, 186.407044366)],
                knots=[0, 0, 0, 0.079273417, 0.079273417, 0.079273417], degree=2))
        make_face()
        with Locations((162.602661576, 77.410928704)):
            Circle(SPLIT1_4_OUTLINE_R, mode=Mode.SUBTRACT)
        with Locations((160.028504238, 92.3925)):
            Circle(SPLIT1_4_OUTLINE_R_2, mode=Mode.SUBTRACT)
        with Locations((0, 184.785)):
            Circle(SPLIT1_4_OUTLINE_R_2, mode=Mode.SUBTRACT)
        with Locations((14.2615, 179.5235)):
            Circle(SPLIT1_4_OUTLINE_R, mode=Mode.SUBTRACT)
        with Locations((102.112571296, 148.341161576)):
            Circle(SPLIT1_4_OUTLINE_R, mode=Mode.SUBTRACT)
        with Locations((92.3925, 160.028504238)):
            Circle(SPLIT1_4_OUTLINE_R_2, mode=Mode.SUBTRACT)
    extrude(amount=SPLIT1_4_DEPTH)


solid = Compound([part.part, body_2.part, body_3.part, body_4.part])
